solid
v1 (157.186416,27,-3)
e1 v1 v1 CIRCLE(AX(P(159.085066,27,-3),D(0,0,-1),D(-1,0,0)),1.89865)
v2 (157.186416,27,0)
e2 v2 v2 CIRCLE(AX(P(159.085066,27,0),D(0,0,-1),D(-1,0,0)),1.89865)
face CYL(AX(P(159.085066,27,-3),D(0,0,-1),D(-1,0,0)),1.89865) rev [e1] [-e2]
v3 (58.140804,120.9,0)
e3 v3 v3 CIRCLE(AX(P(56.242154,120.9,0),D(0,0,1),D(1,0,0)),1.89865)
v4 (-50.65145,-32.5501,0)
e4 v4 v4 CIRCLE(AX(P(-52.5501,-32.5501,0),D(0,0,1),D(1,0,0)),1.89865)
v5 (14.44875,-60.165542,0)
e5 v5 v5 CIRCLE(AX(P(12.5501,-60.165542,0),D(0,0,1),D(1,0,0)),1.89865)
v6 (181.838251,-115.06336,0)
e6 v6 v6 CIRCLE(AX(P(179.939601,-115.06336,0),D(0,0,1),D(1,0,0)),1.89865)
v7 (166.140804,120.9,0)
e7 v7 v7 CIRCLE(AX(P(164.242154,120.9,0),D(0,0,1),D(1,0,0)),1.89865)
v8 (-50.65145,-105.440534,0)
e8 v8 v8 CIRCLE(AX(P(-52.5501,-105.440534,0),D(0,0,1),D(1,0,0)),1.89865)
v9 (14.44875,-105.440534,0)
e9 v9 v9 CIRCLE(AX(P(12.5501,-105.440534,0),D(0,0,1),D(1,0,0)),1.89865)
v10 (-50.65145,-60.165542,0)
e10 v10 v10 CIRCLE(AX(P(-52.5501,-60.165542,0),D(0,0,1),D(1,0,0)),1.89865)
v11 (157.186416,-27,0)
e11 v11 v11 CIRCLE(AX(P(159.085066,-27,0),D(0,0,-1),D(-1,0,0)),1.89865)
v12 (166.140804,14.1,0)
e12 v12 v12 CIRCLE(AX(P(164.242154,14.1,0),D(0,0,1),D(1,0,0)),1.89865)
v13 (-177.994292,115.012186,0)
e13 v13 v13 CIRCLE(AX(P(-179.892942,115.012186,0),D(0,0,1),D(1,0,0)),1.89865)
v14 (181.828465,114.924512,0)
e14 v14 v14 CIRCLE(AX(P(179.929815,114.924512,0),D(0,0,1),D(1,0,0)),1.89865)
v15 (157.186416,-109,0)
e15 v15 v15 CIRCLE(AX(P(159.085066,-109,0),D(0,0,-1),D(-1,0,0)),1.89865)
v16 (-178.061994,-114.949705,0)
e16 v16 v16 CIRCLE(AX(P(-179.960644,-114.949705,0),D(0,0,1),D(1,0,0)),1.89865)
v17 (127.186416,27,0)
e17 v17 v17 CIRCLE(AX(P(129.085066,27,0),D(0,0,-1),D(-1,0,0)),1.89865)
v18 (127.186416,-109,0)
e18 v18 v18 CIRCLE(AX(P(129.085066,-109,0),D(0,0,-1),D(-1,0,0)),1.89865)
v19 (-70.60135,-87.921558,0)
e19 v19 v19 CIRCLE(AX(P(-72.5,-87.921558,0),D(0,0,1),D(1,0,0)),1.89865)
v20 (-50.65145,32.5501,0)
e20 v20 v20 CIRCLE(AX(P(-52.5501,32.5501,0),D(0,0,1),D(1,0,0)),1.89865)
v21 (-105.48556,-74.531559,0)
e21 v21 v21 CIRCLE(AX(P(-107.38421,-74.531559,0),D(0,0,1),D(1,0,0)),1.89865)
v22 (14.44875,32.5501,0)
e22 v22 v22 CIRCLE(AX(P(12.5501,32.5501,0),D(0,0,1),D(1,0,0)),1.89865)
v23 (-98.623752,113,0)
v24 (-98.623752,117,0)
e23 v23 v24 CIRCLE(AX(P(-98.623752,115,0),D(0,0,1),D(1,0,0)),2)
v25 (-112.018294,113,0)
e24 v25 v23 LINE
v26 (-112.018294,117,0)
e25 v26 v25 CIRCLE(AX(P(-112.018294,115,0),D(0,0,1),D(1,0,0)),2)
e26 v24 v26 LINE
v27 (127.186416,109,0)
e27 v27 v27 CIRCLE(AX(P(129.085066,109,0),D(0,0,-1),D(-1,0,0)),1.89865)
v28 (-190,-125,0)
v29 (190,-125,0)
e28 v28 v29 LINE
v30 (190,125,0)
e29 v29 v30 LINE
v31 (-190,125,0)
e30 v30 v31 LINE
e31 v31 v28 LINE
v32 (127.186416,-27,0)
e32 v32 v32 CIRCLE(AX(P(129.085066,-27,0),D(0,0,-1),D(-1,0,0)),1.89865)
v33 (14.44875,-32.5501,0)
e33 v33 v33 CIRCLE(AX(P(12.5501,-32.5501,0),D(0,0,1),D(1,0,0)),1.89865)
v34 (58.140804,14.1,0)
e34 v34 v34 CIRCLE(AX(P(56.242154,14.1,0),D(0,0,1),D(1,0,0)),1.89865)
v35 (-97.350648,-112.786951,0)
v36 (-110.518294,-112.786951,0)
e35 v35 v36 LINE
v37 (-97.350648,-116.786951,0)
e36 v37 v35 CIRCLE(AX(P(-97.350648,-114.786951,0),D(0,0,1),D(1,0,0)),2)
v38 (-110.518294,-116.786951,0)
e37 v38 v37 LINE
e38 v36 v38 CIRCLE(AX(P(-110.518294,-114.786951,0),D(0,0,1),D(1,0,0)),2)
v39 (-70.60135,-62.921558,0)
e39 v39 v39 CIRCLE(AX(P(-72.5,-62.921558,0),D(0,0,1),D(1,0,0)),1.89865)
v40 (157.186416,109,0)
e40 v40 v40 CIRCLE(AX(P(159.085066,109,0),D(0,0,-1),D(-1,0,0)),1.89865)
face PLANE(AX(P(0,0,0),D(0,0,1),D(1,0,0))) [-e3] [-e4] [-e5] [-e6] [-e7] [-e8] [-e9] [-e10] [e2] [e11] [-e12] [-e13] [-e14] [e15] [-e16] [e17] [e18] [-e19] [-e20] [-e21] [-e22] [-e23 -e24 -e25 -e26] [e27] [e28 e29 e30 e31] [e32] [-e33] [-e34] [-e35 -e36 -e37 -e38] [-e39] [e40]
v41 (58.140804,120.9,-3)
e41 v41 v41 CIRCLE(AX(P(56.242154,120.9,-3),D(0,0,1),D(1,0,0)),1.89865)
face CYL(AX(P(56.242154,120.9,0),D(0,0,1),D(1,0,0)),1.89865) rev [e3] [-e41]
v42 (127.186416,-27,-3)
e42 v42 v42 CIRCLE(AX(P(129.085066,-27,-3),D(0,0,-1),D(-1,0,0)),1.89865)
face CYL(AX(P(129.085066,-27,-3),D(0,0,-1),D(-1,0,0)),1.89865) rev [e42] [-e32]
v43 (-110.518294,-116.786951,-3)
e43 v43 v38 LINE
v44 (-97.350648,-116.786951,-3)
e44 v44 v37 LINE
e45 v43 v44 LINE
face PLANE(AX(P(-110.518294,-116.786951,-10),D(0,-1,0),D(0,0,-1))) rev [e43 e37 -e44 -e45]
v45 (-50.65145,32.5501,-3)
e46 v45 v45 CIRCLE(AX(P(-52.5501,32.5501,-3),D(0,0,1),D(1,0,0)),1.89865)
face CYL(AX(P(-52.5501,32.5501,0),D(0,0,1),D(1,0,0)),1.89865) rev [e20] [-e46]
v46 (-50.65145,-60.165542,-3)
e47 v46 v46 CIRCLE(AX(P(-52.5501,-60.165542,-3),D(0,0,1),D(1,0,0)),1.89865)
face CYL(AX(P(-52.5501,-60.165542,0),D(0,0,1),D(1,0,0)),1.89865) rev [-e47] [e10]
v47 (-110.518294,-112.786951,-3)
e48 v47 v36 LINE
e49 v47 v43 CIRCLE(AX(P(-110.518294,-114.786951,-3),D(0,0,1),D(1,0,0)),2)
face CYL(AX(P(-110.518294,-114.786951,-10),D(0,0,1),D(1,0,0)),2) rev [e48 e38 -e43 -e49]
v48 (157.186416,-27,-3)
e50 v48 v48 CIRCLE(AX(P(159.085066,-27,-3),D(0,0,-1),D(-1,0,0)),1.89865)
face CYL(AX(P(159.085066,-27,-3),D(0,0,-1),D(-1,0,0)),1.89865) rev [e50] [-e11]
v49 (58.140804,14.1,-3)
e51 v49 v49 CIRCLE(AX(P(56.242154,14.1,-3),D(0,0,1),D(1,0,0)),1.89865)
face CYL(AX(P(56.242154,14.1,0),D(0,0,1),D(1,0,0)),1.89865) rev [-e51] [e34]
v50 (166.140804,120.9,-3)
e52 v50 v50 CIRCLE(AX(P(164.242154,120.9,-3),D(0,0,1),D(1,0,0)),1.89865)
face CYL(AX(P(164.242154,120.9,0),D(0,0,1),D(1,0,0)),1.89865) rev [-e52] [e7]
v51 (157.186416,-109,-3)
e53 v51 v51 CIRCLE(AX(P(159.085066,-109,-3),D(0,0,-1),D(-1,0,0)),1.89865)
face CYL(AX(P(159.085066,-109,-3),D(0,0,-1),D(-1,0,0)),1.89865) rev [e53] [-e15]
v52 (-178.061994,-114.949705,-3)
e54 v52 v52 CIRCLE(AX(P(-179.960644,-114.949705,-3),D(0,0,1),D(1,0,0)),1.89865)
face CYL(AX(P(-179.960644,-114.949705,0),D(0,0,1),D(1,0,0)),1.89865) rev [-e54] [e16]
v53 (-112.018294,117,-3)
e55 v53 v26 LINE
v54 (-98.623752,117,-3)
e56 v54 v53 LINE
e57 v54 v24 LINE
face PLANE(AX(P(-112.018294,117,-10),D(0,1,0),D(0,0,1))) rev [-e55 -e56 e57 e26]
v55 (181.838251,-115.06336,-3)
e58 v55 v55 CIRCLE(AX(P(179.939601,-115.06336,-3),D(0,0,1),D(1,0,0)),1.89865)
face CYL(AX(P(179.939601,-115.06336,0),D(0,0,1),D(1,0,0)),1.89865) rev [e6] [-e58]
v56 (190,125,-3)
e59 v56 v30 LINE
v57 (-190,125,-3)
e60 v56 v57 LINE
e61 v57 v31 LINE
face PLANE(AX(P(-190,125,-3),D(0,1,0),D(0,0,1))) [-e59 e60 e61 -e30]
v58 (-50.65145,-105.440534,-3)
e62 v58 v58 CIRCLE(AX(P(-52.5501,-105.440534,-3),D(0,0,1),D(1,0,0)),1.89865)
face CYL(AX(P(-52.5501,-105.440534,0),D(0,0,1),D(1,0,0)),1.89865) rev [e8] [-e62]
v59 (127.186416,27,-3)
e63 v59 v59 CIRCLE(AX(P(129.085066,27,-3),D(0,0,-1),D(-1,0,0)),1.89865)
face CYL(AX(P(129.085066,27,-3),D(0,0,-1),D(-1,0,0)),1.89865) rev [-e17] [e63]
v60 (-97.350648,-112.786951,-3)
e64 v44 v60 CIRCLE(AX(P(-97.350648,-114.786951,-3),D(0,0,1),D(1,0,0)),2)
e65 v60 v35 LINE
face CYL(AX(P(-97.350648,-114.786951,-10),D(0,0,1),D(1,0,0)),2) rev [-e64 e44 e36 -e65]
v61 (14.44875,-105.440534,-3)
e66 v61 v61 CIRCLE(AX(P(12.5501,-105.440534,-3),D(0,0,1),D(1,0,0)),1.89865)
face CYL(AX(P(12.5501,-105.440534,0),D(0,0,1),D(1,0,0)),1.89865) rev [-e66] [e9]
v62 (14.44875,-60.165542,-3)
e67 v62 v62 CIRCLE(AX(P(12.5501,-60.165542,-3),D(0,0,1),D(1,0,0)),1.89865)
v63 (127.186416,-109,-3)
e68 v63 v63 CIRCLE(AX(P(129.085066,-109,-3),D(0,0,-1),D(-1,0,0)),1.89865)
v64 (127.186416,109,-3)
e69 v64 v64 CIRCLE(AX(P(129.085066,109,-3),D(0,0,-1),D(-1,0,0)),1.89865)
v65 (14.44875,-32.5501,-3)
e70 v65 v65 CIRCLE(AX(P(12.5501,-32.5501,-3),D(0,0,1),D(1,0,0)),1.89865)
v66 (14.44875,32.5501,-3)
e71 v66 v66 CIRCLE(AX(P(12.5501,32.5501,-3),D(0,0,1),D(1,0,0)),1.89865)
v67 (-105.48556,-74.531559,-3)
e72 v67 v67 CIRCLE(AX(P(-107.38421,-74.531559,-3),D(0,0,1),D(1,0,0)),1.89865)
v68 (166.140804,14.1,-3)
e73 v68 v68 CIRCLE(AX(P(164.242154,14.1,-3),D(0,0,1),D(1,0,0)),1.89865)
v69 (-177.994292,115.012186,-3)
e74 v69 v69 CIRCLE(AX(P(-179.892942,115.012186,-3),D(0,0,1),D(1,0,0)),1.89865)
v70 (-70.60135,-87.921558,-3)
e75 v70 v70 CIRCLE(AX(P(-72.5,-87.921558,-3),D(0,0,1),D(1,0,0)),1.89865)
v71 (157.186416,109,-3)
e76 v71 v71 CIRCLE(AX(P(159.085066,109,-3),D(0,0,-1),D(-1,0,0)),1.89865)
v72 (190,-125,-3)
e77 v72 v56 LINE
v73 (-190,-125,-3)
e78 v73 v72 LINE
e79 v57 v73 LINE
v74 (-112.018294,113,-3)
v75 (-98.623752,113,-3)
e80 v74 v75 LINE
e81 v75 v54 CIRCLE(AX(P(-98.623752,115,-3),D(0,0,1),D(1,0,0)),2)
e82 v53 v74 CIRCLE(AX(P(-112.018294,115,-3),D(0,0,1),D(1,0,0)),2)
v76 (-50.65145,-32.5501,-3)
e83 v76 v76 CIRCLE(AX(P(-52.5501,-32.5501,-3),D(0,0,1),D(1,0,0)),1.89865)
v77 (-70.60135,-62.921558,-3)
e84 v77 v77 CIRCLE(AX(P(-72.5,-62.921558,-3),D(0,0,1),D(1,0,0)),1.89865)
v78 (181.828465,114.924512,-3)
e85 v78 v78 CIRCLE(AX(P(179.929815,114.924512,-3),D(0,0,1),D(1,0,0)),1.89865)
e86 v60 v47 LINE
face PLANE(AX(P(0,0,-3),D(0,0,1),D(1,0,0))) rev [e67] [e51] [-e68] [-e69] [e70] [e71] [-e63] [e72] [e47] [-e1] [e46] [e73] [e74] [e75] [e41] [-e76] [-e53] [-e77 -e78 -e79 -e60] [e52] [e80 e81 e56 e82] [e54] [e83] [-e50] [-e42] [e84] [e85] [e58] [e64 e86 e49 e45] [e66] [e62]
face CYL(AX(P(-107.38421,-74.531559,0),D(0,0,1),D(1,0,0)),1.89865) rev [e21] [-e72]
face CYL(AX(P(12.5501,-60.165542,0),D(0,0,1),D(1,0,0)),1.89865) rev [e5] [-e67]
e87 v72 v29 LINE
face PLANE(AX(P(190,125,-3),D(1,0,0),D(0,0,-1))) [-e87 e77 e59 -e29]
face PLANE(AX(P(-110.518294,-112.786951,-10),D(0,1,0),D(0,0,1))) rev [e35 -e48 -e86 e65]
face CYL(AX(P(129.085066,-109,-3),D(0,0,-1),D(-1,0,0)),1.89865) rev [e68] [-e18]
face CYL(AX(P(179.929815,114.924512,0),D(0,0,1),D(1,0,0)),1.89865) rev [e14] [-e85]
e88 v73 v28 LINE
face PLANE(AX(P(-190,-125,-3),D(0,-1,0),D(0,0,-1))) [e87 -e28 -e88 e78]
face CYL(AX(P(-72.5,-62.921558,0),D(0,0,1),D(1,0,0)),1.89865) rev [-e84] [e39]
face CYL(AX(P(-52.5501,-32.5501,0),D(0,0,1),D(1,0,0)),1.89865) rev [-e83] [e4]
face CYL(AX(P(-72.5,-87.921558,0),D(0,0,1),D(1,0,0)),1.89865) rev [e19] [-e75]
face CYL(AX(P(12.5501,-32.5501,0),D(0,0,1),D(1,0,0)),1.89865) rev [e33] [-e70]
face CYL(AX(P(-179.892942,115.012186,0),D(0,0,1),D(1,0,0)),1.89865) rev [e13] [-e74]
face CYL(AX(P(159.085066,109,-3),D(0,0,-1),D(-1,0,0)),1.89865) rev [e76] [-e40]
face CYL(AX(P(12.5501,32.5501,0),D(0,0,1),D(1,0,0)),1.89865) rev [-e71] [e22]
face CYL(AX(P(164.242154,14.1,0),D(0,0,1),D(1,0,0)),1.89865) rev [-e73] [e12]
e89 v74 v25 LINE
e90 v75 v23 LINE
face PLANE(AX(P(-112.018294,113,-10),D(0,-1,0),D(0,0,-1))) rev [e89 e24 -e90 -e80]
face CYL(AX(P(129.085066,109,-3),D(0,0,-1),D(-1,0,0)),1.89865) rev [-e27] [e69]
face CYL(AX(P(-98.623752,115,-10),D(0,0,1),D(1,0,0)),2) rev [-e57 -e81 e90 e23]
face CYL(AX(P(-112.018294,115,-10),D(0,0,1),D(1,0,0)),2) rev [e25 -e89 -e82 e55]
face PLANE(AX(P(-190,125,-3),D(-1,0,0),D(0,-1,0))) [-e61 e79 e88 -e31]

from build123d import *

# Parameters (mm, degrees)
SKETCH1_W                     = 380
SKETCH1_H                     = 250
BASE_FLANGE2_DEPTH            = 3
F_25_0_1495_DIAMETER_SLOT1_D  = 3.7973
F_25_0_1495_DIAMETER_SLOT2_D  = 3.7973
F_25_0_1495_DIAMETER_SLOT3_D  = 3.7973
F_25_0_1495_DIAMETER_SLOT4_D  = 3.7973
F_25_0_1495_DIAMETER_SLOT5_D  = 3.7973
F_25_0_1495_DIAMETER_SLOT6_D  = 3.7973
F_25_0_1495_DIAMETER_SLOT8_D  = 3.7973
F_25_0_1495_DIAMETER_SLOT9_D  = 3.7973
F_25_0_1495_DIAMETER_SLOT10_D = 3.7973
CUT_EXTRUDE1_DEPTH            = 10
CUT_EXTRUDE2_DEPTH            = 10
F_25_0_1495_DIAMETER_SLOT11_D = 3.7973


# Sheet-metal steps are written as plain solids
with BuildPart() as part:
    # Sketch1 → Base-Flange2 (new body)
    with BuildSketch(Plane.XY):
        Rectangle(SKETCH1_W, SKETCH1_H)
    extrude(amount=-BASE_FLANGE2_DEPTH)

    # #25 (0.1495) Diameter Slot1 (through all)
    with Locations(Plane.XY):
        with Locations((179.929815024, 114.924511868)):
            Hole(F_25_0_1495_DIAMETER_SLOT1_D / 2)

    # #25 (0.1495) Diameter Slot2 (through all)
    with Locations(Plane.XY):
        with Locations((179.939600723, -115.063359711)):
            Hole(F_25_0_1495_DIAMETER_SLOT2_D / 2)

    # #25 (0.1495) Diameter Slot3 (through all)
    with Locations(Plane.XY):
        with Locations((-179.960644033, -114.949705326)):
            Hole(F_25_0_1495_DIAMETER_SLOT3_D / 2)

    # #25 (0.1495) Diameter Slot4 (through all)
    with Locations(Plane.XY):
        with Locations((-179.892941698, 115.012185811)):
            Hole(F_25_0_1495_DIAMETER_SLOT4_D / 2)

    # #25 (0.1495) Diameter Slot5 (through all)
    with Locations(Plane.XY):
        with Locations((-52.5501, 32.5501), (-52.5501, -32.5501), (12.5501, -32.5501), (12.5501, 32.5501)):
            Hole(F_25_0_1495_DIAMETER_SLOT5_D / 2)

    # #25 (0.1495) Diameter Slot6 (through all)
    with Locations(Plane.XY):
        with Locations((-107.384209935, -74.531559227), (-72.5, -87.921557802), (-72.5, -62.921557802)):
            Hole(F_25_0_1495_DIAMETER_SLOT6_D / 2)

    # #25 (0.1495) Diameter Slot8 (through all)
    with Locations(Plane.XY):
        with Locations((164.24215408, 120.9), (56.24215408, 120.9), (56.24215408, 14.1), (164.24215408, 14.1)):
            Hole(F_25_0_1495_DIAMETER_SLOT8_D / 2)

    # #25 (0.1495) Diameter Slot9 (through all)
    with Locations(Plane.XY):
        with Locations((-52.5501, -105.440534025), (12.5501, -60.165541974), (-52.5501, -60.165541974)):
            Hole(F_25_0_1495_DIAMETER_SLOT9_D / 2)

    # #25 (0.1495) Diameter Slot10 (through all)
    with Locations(Plane.XY):
        with Locations((12.5501, -105.440534025)):
            Hole(F_25_0_1495_DIAMETER_SLOT10_D / 2)

    # Sketch44 → Cut-Extrude1 (cut)
    with BuildSketch(Plane.XY):
        with BuildLine():
            Line((-110.518294474, -112.786951447), (-97.350647517, -112.786951447))
            ThreePointArc((-97.350647517, -112.786951447), (-95.350647517, -114.786951447), (-97.350647517, -116.786951447))
            Line((-97.350647517, -116.786951447), (-110.518294474, -116.786951447))
            ThreePointArc((-110.518294474, -116.786951447), (-112.518294474, -114.786951447), (-110.518294474, -112.786951447))
        make_face()
    extrude(amount=-CUT_EXTRUDE1_DEPTH, mode=Mode.SUBTRACT)

    # Sketch45 → Cut-Extrude2 (cut)
    with BuildSketch(Plane.XY):
        with BuildLine():
            Line((-112.018294474, 117), (-98.623751671, 117))
            ThreePointArc((-98.623751671, 117), (-96.623751671, 115), (-98.623751671, 113))
            Line((-98.623751671, 113), (-112.018294474, 113))
            ThreePointArc((-112.018294474, 113), (-114.018294474, 115), (-112.018294474, 117))
        make_face()
    extrude(amount=-CUT_EXTRUDE2_DEPTH, mode=Mode.SUBTRACT)

    # #25 (0.1495) Diameter Slot11 (through all)
    with Locations(Plane(origin=(0, 0, -3), x_dir=(-1, 0, 0), z_dir=(0, 0, -1))):
        with Locations((-129.085065503, -27), (-159.085065503, -27), (-159.085065503, -109), (-129.085065503, -109), (-159.085065503, 27), (-129.085065503, 27), (-159.085065503, 109), (-129.085065503, 109)):
            Hole(F_25_0_1495_DIAMETER_SLOT11_D / 2)


solid = part.part
